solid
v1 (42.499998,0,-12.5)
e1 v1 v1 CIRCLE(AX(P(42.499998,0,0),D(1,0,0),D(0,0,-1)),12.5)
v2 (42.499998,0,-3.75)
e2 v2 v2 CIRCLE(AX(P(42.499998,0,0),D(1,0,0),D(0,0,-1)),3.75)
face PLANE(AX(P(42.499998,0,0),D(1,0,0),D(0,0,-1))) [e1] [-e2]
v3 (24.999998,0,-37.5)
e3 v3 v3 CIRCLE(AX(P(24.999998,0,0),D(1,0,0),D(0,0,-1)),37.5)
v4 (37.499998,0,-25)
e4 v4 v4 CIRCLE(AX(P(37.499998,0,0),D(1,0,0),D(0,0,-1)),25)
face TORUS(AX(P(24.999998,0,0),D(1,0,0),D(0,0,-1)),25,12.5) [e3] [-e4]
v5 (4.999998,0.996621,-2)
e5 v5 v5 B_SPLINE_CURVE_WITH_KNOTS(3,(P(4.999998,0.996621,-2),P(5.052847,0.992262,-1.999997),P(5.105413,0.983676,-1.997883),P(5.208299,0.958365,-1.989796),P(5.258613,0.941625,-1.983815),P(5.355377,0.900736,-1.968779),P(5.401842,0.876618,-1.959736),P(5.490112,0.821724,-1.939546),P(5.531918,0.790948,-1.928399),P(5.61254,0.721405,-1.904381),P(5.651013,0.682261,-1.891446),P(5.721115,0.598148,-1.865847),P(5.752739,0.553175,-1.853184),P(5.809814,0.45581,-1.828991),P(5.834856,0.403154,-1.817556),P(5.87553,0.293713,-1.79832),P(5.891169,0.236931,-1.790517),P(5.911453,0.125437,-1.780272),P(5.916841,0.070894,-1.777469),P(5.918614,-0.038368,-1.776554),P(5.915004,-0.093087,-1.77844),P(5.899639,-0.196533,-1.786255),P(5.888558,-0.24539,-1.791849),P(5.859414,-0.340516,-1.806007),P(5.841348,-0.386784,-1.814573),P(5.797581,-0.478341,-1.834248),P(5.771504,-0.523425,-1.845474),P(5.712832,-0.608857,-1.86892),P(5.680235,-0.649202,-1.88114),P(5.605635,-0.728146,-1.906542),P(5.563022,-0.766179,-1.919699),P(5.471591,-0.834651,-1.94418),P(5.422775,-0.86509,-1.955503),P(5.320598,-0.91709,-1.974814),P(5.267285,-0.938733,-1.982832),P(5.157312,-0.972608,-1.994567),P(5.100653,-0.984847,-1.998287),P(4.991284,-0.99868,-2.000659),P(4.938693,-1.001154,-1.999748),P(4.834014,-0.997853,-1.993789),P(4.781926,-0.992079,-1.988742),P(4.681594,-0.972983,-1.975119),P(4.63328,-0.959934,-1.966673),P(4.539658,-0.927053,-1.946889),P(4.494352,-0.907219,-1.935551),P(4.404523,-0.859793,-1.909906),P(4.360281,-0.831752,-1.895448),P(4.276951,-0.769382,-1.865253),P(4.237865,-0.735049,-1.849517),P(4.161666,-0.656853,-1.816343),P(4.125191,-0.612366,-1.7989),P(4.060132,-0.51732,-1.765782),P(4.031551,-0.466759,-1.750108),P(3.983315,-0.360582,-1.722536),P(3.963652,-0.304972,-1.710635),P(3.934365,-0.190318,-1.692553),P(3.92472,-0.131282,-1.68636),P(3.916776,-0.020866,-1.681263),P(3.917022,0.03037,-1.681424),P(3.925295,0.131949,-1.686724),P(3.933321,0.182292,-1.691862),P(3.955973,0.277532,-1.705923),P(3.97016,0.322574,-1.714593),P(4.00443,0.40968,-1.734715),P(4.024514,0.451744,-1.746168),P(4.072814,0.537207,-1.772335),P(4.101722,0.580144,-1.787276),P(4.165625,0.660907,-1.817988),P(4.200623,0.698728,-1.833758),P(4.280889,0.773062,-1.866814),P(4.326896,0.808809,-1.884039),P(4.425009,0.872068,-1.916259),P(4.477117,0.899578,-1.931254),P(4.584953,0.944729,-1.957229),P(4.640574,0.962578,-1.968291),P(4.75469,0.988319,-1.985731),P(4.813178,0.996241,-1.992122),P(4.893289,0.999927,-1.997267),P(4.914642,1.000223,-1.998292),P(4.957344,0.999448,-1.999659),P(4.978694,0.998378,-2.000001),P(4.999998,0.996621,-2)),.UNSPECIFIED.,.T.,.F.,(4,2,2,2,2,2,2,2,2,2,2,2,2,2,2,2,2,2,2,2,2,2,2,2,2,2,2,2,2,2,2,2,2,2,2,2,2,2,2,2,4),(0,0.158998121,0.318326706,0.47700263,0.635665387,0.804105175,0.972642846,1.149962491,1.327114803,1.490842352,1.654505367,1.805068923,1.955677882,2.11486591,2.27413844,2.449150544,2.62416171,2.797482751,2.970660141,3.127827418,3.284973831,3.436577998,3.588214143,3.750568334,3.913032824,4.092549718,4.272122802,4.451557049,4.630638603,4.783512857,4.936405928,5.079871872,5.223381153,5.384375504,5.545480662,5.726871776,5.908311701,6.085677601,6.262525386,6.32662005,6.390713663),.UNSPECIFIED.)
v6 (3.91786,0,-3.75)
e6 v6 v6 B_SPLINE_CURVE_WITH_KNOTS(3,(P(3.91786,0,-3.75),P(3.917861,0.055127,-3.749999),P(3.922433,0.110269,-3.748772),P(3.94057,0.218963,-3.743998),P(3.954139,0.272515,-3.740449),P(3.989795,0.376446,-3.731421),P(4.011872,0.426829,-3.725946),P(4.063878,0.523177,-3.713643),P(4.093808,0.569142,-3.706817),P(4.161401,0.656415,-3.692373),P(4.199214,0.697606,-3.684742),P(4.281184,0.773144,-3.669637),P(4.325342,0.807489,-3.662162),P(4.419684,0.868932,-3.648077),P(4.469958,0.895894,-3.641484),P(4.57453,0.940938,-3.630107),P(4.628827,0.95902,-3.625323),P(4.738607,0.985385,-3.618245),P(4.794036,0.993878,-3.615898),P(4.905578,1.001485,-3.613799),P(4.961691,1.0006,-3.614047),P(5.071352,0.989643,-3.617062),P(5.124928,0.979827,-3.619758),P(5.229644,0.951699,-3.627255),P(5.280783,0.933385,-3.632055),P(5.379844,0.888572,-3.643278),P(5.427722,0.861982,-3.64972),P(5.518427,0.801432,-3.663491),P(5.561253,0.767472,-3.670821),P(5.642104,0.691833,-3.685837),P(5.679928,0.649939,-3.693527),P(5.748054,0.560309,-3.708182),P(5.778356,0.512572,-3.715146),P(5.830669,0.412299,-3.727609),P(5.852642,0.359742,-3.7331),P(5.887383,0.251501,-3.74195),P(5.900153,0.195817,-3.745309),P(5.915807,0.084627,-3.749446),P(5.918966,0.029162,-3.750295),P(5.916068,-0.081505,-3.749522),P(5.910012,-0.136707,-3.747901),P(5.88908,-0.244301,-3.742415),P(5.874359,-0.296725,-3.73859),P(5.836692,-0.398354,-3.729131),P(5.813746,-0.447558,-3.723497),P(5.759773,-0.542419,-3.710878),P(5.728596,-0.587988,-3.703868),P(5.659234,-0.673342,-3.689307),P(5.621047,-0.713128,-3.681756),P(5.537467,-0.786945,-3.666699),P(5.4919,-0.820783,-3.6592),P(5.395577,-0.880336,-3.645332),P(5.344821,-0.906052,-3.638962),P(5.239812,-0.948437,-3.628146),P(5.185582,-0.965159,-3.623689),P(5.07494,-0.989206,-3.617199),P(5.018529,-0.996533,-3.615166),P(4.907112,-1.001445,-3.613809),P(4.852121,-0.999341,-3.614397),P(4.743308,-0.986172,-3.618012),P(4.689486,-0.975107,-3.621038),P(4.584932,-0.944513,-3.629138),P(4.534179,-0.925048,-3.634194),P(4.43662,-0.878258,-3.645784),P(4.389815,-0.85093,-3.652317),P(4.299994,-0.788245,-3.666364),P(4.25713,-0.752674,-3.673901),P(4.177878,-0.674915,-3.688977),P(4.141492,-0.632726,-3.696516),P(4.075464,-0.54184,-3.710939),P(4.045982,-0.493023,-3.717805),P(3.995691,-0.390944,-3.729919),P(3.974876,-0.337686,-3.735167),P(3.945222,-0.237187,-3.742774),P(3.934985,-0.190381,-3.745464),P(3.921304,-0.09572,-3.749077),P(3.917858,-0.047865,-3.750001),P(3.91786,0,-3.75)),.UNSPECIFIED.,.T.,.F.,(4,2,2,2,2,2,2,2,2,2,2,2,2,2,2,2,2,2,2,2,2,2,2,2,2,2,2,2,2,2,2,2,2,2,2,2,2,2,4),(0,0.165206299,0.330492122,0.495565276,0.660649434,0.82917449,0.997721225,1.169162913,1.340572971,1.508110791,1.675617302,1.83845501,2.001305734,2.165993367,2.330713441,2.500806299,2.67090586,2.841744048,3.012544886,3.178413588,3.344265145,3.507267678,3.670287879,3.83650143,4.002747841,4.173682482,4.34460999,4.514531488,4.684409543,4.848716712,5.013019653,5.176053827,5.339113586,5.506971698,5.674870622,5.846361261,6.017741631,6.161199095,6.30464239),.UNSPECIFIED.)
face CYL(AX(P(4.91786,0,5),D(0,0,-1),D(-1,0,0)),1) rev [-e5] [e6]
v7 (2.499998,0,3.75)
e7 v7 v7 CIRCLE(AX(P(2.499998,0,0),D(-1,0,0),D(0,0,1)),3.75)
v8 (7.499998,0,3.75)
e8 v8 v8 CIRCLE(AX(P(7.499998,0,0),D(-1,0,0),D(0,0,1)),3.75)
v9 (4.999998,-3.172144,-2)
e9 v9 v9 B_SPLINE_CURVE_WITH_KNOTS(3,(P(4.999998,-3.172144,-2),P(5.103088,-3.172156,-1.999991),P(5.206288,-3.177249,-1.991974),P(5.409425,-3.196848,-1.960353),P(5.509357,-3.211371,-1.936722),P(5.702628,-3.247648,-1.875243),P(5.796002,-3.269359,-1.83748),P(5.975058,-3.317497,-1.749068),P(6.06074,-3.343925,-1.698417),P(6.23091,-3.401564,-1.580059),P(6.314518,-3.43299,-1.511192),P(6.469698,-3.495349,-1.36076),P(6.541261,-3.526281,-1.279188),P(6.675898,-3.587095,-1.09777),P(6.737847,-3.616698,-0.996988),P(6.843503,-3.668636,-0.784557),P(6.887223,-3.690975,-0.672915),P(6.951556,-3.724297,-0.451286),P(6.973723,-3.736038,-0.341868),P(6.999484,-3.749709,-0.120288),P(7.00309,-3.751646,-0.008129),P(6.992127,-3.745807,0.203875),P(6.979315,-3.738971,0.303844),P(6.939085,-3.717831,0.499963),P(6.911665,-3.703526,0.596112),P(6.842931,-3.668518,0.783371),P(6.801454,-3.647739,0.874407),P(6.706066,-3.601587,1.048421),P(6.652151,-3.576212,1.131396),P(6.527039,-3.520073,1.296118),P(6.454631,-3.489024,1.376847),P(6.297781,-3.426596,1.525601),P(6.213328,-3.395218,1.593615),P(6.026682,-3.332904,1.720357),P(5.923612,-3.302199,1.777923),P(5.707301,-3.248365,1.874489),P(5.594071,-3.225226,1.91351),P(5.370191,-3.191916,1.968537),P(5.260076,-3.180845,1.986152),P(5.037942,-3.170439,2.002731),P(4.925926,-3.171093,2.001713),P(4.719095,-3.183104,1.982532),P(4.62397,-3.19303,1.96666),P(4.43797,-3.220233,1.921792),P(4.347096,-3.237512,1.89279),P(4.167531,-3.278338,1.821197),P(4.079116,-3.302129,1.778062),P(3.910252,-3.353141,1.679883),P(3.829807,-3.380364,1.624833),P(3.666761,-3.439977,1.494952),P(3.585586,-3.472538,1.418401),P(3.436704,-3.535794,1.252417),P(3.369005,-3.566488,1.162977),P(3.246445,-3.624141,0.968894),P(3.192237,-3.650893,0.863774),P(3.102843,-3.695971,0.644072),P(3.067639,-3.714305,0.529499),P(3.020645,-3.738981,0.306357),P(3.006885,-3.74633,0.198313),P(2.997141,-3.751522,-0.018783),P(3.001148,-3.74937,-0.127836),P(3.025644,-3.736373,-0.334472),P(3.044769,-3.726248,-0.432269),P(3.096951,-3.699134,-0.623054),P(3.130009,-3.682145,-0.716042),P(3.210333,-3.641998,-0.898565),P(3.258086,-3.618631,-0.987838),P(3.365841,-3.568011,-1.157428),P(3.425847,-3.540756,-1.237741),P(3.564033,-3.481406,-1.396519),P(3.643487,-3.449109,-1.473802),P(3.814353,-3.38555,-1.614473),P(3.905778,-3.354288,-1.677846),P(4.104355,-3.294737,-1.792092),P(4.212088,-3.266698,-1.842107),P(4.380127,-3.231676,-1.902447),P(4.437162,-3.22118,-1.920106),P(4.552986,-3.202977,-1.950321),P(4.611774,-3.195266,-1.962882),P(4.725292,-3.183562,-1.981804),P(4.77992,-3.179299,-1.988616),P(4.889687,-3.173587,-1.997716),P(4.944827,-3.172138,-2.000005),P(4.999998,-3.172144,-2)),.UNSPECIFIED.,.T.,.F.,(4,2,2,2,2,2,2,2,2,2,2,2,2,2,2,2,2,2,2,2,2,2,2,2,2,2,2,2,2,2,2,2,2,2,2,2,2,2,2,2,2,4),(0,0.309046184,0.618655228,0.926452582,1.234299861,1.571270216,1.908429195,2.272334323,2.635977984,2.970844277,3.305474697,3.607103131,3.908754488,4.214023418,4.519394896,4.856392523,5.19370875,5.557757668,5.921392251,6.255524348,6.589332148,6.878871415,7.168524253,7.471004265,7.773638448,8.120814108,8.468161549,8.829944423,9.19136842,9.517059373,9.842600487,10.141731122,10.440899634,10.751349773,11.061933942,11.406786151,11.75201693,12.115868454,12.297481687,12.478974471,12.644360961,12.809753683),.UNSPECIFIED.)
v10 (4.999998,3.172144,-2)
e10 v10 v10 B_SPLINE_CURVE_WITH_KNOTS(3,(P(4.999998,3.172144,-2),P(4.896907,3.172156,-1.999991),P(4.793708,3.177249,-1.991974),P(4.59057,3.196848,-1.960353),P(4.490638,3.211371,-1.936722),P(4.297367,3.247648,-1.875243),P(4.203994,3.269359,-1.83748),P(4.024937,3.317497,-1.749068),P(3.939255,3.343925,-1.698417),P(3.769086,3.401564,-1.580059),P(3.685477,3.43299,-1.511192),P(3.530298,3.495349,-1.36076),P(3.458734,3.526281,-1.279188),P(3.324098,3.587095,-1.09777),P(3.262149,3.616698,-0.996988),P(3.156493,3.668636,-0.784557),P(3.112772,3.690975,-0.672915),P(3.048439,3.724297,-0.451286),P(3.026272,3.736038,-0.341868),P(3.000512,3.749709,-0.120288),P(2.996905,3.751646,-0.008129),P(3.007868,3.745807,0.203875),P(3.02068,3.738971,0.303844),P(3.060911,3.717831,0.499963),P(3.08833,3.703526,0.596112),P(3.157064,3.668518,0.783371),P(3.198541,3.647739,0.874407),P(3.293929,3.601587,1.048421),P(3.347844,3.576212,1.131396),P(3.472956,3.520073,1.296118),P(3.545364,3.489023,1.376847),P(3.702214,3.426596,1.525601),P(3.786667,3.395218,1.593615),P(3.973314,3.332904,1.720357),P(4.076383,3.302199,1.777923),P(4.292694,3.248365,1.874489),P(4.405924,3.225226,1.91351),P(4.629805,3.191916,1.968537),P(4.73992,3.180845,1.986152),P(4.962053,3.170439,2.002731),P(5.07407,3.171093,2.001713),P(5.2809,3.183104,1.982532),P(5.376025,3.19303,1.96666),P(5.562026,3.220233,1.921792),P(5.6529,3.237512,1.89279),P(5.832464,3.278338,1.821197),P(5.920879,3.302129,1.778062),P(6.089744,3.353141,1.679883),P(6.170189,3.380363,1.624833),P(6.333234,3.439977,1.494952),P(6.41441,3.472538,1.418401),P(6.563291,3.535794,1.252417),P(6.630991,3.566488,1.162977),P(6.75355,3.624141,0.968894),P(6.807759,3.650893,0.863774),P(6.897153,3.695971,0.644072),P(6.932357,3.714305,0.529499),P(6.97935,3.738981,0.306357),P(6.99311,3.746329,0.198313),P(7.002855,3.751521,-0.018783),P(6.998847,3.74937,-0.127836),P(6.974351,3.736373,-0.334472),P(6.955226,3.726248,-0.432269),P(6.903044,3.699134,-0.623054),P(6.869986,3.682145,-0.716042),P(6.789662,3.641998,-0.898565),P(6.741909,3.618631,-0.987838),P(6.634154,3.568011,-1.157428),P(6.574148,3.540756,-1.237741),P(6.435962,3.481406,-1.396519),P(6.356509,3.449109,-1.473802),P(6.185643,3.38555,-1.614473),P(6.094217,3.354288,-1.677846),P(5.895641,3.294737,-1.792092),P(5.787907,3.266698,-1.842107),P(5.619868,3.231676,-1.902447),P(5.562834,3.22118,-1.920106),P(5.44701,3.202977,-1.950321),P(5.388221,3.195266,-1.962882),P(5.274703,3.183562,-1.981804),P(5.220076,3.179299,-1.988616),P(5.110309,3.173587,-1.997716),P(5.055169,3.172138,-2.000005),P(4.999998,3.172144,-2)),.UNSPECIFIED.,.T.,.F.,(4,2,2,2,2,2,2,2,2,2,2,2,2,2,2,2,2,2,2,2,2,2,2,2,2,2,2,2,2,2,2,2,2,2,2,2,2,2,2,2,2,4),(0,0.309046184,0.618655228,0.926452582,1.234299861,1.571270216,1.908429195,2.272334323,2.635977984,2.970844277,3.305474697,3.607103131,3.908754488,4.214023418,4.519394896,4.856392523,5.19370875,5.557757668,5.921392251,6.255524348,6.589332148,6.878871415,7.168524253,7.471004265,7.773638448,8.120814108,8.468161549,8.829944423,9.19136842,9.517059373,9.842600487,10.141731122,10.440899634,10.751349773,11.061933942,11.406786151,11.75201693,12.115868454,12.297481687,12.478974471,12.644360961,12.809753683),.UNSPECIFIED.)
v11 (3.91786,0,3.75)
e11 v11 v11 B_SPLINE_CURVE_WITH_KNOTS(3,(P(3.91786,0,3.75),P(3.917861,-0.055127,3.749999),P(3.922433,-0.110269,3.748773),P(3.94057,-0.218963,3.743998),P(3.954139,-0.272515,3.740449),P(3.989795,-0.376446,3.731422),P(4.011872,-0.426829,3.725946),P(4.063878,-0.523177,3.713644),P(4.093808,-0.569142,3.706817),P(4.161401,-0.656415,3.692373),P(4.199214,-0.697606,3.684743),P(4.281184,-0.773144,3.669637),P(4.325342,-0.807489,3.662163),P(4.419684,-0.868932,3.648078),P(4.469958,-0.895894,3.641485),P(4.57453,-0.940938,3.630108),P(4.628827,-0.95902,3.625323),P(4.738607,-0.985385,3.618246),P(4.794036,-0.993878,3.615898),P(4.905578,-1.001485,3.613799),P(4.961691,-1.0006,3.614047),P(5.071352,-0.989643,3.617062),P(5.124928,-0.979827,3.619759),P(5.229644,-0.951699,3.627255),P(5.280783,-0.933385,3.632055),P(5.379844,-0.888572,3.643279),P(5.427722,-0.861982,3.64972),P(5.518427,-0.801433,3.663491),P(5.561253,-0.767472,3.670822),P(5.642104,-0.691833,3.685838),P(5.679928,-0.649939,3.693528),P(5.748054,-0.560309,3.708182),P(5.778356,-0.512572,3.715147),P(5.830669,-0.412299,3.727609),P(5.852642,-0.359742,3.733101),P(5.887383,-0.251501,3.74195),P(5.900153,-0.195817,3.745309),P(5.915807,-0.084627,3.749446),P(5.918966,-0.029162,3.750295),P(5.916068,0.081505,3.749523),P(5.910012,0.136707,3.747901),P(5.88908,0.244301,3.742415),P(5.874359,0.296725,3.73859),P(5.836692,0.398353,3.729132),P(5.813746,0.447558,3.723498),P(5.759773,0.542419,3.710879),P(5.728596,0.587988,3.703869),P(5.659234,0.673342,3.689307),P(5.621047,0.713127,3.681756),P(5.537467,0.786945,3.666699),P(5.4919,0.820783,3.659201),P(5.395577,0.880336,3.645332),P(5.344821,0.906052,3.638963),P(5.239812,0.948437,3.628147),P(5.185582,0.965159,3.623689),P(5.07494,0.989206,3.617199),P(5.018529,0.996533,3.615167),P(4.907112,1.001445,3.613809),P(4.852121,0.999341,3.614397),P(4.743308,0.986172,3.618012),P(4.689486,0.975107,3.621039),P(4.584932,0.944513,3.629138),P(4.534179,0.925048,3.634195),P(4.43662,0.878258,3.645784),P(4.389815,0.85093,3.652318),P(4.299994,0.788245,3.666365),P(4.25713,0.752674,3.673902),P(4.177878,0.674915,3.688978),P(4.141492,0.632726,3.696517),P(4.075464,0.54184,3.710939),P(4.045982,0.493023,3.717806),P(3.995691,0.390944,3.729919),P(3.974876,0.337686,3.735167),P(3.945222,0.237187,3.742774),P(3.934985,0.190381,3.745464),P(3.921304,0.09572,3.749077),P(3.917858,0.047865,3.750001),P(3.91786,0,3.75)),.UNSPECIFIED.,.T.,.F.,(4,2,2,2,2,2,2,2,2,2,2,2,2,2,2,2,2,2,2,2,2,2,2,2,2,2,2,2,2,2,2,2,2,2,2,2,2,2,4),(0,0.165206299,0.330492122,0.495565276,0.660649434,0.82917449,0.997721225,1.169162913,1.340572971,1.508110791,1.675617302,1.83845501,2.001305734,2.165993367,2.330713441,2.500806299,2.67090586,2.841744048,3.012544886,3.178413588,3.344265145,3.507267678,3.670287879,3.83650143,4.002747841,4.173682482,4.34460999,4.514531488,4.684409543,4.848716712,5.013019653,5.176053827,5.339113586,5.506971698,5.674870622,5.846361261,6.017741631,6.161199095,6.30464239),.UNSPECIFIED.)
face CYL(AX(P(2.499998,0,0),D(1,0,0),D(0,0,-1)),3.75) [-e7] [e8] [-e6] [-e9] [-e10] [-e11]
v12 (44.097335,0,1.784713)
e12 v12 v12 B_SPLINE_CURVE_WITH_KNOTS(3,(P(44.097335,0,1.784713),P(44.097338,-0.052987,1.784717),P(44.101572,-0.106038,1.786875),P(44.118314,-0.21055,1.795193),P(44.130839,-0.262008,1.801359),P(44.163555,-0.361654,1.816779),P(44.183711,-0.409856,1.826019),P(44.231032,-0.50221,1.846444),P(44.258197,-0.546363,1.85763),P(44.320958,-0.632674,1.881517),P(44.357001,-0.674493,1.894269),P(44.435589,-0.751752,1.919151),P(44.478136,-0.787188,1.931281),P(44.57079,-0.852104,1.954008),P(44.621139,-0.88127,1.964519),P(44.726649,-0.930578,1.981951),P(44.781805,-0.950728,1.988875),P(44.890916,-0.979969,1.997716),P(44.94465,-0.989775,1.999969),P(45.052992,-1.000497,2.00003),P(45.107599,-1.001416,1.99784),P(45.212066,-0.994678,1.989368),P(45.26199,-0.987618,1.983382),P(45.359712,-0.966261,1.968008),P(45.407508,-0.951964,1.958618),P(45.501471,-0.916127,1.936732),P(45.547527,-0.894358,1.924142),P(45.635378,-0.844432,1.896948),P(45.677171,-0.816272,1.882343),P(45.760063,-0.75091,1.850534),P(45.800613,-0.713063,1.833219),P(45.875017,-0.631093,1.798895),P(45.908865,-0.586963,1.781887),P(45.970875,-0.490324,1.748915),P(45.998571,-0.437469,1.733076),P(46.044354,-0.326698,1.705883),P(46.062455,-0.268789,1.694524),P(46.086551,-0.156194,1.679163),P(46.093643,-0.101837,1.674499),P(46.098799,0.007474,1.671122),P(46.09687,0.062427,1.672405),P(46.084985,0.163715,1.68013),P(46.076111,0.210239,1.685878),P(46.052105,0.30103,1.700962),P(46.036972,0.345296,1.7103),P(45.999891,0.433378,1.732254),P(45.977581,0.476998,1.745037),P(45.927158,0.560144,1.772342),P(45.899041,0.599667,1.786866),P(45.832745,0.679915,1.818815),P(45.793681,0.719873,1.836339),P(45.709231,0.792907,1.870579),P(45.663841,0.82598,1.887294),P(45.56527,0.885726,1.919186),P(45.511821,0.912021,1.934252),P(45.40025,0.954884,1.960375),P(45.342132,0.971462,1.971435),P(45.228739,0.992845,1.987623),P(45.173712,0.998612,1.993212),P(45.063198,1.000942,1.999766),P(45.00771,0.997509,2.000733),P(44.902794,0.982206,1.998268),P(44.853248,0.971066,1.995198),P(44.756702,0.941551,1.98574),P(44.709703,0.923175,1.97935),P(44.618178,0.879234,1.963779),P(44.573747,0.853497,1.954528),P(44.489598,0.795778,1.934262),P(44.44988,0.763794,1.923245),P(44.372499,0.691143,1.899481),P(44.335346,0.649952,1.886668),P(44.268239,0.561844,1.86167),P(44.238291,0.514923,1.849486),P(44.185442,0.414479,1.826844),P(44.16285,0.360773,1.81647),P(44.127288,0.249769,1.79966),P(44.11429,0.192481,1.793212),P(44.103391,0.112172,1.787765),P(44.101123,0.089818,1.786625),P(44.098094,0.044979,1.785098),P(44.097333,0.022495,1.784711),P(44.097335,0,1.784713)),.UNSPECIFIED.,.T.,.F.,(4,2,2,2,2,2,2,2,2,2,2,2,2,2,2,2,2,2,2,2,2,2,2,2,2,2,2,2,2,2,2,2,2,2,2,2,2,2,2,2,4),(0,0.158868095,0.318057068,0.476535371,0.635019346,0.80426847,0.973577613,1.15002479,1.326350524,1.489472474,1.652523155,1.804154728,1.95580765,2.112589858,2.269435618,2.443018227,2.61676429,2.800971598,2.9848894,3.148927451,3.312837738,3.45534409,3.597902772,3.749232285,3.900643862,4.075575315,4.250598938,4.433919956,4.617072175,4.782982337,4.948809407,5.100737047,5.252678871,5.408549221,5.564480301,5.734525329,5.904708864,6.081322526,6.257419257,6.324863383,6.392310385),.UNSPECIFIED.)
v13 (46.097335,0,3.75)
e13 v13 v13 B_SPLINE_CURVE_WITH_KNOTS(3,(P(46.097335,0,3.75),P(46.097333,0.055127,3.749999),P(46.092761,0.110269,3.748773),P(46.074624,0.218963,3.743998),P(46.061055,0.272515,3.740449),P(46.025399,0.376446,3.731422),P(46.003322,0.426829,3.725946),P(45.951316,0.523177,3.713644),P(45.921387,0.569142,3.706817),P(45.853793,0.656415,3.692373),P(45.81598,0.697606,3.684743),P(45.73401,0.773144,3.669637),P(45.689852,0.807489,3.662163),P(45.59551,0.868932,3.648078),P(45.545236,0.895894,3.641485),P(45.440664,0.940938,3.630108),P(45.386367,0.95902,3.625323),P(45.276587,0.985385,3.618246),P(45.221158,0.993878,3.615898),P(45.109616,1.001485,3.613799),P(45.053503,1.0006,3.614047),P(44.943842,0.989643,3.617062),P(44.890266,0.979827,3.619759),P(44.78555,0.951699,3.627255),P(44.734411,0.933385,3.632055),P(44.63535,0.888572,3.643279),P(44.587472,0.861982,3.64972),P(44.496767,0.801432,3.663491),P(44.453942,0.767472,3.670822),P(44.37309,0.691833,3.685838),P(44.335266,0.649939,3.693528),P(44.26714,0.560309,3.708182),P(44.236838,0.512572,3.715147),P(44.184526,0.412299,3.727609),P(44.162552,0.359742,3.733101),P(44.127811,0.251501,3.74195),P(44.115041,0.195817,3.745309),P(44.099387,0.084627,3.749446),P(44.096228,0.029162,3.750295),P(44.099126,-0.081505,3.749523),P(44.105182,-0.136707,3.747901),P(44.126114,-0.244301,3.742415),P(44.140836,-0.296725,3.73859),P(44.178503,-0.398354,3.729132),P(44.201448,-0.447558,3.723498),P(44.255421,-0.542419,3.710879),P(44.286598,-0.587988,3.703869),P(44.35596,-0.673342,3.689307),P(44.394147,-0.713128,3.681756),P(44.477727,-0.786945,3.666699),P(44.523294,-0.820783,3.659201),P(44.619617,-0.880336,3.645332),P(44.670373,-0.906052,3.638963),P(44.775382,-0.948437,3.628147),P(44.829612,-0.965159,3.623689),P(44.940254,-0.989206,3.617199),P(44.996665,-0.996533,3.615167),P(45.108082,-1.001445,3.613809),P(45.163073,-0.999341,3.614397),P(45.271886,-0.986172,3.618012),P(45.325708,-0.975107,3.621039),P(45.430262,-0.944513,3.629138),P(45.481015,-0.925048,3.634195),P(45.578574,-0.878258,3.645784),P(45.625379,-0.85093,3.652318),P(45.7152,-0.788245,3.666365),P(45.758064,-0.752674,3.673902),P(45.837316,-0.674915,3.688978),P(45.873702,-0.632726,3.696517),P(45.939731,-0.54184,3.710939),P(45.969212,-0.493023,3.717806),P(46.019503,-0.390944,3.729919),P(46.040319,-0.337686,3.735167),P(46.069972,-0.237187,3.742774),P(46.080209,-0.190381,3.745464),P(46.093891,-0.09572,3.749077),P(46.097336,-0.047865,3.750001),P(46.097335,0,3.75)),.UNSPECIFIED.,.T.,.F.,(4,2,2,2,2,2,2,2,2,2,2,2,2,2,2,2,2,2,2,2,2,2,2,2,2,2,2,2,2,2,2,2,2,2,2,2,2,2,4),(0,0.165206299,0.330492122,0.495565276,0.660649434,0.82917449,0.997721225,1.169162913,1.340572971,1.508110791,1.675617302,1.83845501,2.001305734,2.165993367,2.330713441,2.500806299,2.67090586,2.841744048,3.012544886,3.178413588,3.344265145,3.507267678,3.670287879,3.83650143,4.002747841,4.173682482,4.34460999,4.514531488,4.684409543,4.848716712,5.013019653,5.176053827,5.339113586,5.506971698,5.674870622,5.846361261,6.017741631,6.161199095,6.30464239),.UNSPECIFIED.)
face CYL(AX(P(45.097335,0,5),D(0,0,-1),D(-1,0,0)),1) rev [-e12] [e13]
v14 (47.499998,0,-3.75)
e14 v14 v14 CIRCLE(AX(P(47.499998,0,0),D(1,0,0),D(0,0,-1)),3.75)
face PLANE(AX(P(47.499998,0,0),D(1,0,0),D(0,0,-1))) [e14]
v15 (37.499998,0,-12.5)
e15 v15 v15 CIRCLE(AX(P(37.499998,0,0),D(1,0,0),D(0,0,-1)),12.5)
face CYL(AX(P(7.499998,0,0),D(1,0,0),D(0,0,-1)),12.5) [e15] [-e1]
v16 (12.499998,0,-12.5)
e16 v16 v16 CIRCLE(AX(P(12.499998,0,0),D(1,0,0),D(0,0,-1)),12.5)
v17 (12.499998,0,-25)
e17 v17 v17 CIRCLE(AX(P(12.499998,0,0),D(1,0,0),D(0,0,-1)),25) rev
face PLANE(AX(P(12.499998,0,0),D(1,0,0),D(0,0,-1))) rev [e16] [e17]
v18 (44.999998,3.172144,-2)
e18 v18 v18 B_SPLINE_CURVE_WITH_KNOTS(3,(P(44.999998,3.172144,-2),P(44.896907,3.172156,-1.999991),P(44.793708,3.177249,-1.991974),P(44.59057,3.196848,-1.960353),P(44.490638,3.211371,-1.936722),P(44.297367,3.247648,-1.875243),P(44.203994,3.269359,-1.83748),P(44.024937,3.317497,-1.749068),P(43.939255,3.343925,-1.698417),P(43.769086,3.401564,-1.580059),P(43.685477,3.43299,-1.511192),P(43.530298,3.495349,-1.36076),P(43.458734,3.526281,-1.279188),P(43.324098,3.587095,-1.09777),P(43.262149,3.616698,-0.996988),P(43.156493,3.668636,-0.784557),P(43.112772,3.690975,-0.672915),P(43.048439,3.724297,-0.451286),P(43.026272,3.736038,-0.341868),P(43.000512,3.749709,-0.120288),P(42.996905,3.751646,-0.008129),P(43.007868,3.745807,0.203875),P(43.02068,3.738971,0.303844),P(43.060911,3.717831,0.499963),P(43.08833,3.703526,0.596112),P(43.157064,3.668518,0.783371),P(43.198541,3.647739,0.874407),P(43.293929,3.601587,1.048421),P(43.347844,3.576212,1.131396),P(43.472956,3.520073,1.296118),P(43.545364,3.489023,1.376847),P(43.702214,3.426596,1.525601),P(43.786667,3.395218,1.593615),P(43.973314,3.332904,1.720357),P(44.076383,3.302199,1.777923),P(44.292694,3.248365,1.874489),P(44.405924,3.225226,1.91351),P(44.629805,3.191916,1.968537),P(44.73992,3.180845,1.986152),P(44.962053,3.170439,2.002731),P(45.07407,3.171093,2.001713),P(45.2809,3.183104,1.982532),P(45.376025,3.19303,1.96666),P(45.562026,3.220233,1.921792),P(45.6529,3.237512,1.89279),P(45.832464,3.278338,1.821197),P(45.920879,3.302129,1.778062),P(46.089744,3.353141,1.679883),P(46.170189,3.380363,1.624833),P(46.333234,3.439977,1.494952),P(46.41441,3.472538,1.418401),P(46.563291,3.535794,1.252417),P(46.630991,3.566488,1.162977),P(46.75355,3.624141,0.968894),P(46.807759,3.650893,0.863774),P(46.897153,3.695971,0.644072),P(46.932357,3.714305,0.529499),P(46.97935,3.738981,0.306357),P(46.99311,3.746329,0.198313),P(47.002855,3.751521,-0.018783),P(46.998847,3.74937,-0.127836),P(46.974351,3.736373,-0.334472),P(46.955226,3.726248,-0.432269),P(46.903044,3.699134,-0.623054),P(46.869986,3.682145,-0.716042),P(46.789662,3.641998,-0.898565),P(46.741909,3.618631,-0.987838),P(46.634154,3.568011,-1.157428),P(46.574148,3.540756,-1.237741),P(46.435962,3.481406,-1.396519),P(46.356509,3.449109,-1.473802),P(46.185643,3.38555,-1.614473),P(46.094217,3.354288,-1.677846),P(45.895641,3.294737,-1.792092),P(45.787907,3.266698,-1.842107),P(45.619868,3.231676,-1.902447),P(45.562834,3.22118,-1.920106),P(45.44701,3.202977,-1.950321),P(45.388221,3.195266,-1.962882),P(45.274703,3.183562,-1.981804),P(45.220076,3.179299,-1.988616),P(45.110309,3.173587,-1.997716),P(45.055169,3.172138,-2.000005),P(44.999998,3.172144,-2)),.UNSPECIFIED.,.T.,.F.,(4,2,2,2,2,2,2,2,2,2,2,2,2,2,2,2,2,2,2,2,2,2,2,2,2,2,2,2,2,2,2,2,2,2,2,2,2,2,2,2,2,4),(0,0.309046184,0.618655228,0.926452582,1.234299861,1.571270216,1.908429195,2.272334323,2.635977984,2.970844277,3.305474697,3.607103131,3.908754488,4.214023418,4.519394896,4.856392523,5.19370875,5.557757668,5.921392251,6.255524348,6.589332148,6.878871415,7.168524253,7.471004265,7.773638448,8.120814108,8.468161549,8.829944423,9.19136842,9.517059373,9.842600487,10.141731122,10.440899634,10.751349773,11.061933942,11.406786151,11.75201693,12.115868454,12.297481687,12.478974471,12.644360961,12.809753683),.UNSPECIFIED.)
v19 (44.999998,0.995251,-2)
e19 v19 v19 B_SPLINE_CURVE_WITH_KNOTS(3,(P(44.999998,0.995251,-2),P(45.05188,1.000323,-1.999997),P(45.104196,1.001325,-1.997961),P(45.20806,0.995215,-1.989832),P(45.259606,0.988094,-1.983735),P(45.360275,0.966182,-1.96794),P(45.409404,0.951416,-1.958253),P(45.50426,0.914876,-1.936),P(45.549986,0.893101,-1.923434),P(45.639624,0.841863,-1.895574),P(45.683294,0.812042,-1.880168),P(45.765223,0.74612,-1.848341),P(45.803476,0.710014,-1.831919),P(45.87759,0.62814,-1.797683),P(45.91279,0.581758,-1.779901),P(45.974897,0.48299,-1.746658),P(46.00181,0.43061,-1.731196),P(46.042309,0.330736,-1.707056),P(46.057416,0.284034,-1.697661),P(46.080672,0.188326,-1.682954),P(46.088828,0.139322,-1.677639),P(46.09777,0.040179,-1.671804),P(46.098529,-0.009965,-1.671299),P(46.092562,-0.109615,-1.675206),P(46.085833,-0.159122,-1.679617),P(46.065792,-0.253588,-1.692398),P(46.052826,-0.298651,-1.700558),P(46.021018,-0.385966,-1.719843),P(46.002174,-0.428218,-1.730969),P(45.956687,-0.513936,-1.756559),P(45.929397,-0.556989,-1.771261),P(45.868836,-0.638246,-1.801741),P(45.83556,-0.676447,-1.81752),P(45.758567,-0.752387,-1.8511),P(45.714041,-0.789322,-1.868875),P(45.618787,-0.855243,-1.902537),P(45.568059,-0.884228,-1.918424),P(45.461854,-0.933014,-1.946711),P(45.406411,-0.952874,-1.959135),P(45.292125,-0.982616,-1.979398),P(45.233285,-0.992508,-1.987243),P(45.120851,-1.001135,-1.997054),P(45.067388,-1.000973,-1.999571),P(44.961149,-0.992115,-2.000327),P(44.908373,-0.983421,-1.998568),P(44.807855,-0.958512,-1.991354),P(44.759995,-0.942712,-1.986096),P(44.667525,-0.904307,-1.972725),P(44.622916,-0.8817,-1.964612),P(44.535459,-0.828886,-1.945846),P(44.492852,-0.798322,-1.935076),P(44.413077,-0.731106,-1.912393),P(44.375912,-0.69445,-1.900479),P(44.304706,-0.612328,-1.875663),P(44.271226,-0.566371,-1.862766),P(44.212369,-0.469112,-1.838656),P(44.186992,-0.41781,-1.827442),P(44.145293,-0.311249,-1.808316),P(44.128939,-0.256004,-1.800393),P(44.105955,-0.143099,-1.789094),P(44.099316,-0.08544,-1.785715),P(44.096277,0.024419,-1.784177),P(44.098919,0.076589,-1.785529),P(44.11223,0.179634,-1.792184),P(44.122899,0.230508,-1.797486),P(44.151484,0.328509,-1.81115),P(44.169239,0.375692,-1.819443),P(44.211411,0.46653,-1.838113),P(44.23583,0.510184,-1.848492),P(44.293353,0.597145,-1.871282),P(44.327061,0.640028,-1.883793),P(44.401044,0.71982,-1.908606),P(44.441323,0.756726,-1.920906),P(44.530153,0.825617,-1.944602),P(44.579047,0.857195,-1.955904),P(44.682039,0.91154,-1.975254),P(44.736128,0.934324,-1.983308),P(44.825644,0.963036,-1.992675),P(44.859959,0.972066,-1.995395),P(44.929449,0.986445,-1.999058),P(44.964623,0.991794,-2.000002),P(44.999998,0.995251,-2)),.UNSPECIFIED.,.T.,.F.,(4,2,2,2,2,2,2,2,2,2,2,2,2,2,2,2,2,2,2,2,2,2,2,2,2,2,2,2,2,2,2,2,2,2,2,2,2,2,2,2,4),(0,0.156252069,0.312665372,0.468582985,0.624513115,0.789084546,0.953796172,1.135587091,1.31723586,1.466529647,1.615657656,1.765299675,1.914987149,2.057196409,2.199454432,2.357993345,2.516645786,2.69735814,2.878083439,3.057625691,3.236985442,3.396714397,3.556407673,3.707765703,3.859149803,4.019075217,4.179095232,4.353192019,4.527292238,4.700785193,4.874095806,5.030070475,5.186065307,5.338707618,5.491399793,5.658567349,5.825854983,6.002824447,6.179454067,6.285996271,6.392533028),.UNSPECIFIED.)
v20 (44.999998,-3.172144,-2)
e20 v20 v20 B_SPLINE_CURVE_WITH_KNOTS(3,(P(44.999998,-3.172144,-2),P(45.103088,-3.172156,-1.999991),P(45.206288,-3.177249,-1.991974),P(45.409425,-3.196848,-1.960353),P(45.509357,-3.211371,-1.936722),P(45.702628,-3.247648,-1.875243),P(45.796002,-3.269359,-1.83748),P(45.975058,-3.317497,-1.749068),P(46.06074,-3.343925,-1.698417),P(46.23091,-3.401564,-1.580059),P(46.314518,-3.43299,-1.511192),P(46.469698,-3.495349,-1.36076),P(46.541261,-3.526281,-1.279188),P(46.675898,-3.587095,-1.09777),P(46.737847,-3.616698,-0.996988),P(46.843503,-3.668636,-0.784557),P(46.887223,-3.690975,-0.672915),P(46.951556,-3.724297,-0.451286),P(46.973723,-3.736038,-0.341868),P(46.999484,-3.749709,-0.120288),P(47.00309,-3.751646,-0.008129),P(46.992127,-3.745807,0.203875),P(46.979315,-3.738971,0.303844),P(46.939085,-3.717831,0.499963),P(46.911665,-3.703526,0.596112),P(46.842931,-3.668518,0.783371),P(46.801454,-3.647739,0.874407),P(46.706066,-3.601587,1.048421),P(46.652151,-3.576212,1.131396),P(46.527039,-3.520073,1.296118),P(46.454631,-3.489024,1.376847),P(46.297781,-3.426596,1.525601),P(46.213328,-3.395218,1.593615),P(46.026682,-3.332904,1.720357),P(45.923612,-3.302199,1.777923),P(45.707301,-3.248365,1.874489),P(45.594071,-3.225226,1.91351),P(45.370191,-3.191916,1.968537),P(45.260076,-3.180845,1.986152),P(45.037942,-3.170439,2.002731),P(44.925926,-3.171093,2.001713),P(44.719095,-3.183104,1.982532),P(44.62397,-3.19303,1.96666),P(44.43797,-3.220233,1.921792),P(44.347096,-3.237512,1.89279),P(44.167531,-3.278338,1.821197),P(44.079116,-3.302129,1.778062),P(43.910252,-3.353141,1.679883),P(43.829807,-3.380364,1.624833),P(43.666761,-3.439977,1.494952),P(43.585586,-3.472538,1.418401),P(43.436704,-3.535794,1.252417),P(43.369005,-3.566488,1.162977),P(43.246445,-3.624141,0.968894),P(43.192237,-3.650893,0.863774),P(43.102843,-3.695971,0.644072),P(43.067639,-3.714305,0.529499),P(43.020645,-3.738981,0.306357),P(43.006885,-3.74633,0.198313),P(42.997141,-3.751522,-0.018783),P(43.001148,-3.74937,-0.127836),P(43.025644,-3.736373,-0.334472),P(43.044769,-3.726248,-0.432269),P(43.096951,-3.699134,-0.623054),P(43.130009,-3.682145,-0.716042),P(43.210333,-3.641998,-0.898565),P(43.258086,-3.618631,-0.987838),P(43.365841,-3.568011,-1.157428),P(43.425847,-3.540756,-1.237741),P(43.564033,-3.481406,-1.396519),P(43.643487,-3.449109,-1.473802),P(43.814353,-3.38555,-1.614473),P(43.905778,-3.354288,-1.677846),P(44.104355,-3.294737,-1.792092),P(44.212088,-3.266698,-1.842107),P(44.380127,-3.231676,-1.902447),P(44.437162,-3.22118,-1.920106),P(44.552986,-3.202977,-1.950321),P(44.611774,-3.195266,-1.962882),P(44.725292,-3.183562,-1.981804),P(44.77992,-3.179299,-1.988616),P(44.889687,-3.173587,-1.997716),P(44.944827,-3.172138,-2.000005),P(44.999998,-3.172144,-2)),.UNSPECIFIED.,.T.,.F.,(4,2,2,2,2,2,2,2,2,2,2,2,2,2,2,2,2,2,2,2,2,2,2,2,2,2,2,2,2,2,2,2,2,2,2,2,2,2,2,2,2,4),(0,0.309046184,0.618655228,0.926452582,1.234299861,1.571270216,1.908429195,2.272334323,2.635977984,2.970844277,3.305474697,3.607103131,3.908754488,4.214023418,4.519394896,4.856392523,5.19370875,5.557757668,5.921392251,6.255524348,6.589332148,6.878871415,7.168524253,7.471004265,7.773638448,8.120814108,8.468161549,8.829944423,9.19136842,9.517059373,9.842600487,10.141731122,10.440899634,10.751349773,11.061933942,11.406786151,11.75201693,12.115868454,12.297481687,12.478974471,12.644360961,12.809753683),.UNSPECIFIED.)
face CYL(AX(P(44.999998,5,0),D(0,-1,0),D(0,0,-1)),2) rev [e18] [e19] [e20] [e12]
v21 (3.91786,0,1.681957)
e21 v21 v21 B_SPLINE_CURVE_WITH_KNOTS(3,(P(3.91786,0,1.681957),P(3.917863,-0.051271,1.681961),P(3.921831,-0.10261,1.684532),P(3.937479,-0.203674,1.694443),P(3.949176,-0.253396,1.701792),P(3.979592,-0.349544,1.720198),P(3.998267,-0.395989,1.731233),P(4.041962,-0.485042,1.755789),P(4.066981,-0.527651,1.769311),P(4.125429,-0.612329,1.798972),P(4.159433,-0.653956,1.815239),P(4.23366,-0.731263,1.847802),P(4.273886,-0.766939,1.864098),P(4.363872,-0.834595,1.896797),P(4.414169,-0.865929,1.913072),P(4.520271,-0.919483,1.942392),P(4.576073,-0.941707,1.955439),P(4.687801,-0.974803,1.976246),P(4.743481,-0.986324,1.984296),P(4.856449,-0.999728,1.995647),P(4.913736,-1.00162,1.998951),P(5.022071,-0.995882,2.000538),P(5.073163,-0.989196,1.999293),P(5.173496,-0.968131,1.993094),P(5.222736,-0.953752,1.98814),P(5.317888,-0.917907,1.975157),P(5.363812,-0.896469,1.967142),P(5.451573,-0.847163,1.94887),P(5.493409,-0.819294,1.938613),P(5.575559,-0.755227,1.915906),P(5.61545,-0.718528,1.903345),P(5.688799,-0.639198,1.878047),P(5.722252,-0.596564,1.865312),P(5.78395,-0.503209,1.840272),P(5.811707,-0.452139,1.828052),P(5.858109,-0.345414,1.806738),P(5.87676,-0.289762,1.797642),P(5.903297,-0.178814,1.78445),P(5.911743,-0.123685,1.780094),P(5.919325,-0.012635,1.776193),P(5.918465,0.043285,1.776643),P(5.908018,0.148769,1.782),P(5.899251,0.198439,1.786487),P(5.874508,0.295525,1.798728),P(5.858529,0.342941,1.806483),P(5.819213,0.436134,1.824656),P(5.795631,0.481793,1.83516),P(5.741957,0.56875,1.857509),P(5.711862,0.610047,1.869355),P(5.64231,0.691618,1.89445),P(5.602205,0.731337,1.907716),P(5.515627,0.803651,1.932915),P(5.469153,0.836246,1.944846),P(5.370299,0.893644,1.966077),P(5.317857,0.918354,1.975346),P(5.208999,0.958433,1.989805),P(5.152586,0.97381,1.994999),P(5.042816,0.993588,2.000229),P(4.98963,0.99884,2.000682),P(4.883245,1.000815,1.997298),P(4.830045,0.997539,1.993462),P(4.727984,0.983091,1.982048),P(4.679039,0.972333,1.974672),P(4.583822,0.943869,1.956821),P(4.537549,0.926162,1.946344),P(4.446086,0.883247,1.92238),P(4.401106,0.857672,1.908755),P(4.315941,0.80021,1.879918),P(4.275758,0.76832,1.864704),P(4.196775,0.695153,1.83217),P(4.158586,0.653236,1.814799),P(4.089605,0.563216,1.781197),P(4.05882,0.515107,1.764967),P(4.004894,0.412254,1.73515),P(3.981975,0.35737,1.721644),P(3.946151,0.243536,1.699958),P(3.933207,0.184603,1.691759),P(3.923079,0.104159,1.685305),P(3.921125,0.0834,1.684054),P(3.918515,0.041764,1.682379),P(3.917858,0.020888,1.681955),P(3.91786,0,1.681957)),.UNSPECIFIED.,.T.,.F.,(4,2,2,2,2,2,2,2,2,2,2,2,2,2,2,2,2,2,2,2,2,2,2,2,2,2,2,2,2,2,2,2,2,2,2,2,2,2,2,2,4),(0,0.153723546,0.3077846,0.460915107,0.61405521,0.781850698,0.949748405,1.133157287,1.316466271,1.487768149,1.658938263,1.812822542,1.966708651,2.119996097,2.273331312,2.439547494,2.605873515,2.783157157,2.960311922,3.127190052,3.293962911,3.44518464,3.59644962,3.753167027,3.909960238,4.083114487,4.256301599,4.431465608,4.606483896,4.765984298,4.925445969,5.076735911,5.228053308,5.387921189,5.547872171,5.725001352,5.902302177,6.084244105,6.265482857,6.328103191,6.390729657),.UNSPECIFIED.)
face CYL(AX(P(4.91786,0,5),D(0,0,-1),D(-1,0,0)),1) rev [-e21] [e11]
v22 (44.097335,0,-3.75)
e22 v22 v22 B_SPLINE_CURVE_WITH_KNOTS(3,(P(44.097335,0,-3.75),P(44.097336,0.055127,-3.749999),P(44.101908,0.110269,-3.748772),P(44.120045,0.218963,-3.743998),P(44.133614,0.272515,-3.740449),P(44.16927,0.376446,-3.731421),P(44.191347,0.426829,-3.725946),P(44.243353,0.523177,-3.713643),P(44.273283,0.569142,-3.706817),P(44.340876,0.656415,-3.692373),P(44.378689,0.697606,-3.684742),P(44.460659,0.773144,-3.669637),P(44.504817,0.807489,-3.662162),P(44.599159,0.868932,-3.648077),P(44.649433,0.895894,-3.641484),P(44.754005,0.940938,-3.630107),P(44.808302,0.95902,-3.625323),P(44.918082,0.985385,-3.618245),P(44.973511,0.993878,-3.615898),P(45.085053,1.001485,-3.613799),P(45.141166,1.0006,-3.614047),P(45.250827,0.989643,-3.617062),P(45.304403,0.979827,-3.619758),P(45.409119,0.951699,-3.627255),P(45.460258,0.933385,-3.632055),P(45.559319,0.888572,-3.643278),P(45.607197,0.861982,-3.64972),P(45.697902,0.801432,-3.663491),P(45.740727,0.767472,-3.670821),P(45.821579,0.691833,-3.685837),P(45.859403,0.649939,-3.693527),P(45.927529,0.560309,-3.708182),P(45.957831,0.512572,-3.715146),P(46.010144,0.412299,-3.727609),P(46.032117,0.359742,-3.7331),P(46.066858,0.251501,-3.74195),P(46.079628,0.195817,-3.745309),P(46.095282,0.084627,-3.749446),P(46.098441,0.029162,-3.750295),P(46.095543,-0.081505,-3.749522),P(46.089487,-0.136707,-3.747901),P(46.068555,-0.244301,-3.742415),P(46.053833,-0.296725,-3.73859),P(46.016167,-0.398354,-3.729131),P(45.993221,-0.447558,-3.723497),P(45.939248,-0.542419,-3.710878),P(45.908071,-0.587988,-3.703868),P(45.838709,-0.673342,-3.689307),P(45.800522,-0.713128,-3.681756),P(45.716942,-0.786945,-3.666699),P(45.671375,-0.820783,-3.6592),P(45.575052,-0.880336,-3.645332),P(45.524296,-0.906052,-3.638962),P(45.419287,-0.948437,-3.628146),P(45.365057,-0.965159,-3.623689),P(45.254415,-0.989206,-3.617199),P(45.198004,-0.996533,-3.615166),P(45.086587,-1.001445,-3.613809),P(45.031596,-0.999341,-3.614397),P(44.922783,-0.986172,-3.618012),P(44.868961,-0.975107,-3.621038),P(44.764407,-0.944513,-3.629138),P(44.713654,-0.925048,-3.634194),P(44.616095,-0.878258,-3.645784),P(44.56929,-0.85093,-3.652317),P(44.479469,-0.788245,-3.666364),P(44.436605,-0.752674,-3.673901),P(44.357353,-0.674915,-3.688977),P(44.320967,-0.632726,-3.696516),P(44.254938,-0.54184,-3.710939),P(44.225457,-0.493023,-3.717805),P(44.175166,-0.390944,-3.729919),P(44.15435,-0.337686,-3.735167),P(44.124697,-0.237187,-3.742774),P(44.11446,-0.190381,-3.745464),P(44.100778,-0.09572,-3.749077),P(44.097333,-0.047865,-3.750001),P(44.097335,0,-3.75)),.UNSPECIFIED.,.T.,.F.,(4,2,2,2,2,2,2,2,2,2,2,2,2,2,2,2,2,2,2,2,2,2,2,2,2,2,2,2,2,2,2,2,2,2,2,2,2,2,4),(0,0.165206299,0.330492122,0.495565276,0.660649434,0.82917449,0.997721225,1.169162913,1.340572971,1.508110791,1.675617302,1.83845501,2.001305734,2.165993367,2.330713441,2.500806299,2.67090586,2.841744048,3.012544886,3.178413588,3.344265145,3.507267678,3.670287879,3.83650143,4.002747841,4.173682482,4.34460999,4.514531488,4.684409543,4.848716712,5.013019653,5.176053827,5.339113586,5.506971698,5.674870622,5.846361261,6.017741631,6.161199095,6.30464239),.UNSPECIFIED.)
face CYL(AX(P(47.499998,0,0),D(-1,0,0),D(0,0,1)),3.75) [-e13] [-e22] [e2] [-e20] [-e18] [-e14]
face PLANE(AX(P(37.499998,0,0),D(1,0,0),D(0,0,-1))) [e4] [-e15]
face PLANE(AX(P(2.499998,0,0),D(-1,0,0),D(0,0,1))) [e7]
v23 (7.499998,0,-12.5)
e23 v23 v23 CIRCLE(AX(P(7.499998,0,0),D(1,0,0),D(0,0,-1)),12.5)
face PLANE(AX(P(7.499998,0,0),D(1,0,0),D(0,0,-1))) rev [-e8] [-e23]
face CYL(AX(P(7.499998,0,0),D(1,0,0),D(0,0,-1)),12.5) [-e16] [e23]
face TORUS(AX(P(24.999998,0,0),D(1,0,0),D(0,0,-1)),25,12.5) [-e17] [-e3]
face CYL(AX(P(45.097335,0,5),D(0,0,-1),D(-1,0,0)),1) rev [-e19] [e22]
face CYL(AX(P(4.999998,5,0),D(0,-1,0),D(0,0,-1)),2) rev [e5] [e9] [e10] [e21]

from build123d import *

# Parameters (mm, degrees)
IZIM1_R                          = 75
IZIM1_R_2                        = 25
Y_KSEKLIK_EKSTR_ZYON2_DEPTH      = 50
RADYUS2_R                        = 25
Y_KSEKLIK_EKSTR_ZYON3_DEPTH      = 60
Y_KSEKLIK_EKSTR_ZYON3_DEPTH_BACK = 10
IZIM2_R                          = 25
IZIM3_R                          = 7.5
Y_KSEKLIK_EKSTR_ZYON5_DEPTH      = 10
KES_EKSTR_ZYON1_DEPTH            = 10
KES_EKSTR_ZYON1_DEPTH_BACK       = 10
IZIM4_R                          = 4
Y_KSEKLIK_EKSTR_ZYON6_START      = 10
IZIM5_R                          = 7.5
Y_KSEKLIK_EKSTR_ZYON6_DEPTH      = 10
KES_EKSTR_ZYON2_DEPTH            = 10
KES_EKSTR_ZYON2_DEPTH_BACK       = 10
IZIM6_R                          = 4
KES_EKSTR_ZYON3_DEPTH            = 10
KES_EKSTR_ZYON3_DEPTH_BACK       = 10
IZIM7_R                          = 2
KES_EKSTR_ZYON4_DEPTH            = 10
KES_EKSTR_ZYON4_DEPTH_BACK       = 10
IZIM8_R                          = 2
L_EK2_SCALE                      = 0.5


with BuildPart() as part:
    # Çizim1 → Yükseklik-Ekstrüzyon2 (new body)
    with BuildSketch(Plane(origin=(0, 0, 0), x_dir=(0, 0, -1), z_dir=(1, 0, 0))):
        Circle(IZIM1_R)
        Circle(IZIM1_R_2, mode=Mode.SUBTRACT)
    extrude(amount=Y_KSEKLIK_EKSTR_ZYON2_DEPTH)

    # Radyus2
    radyus2_edges = [part.edges().sort_by_distance(p)[0] for p in [
        (0, 0, 75),
        (50, 0, 75),
    ]]
    fillet(radyus2_edges, radius=RADYUS2_R - 0.0001)  # a hair under: the kernel refuses the full size

    # Çizim2 → Yükseklik-Ekstrüzyon3 (add, two sides: drawn at the far end of the back side and taken through both)
    with BuildSketch(Plane(origin=(0, 0, 0), x_dir=(0, 0, -1), z_dir=(1, 0, 0)).offset(-Y_KSEKLIK_EKSTR_ZYON3_DEPTH_BACK)):
        Circle(IZIM2_R)
    extrude(amount=Y_KSEKLIK_EKSTR_ZYON3_DEPTH + Y_KSEKLIK_EKSTR_ZYON3_DEPTH_BACK)

    # Çizim3 → Yükseklik-Ekstrüzyon5 (add)
    with BuildSketch(Plane(origin=(60, 0, 0), x_dir=(0, 0, -1), z_dir=(1, 0, 0))):
        Circle(IZIM3_R)
    extrude(amount=Y_KSEKLIK_EKSTR_ZYON5_DEPTH)

    # Çizim4 → Kes-Ekstrüzyon1 (cut, two sides: drawn at the far end of the back side and taken through both)
    with BuildSketch(Plane(origin=(0, 0, 0), x_dir=(1, 0, 0), z_dir=(0, 1, 0)).offset(-KES_EKSTR_ZYON1_DEPTH_BACK)):
        with Locations(Location((65, 0, 0), (0, 0, 90))):
            Circle(IZIM4_R)
    extrude(amount=KES_EKSTR_ZYON1_DEPTH + KES_EKSTR_ZYON1_DEPTH_BACK, mode=Mode.SUBTRACT)

    # Çizim5 → Yükseklik-Ekstrüzyon6 (add)
    with BuildSketch(Plane.ZY.offset(10).offset(Y_KSEKLIK_EKSTR_ZYON6_START)):
        with Locations(Location((0, 0, 0), (0, 0, 180))):
            Circle(IZIM5_R)
    extrude(amount=-Y_KSEKLIK_EKSTR_ZYON6_DEPTH)

    # Çizim6 → Kes-Ekstrüzyon2 (cut, two sides: drawn at the far end of the back side and taken through both)
    with BuildSketch(Plane(origin=(0, 0, 0), x_dir=(1, 0, 0), z_dir=(0, 1, 0)).offset(-KES_EKSTR_ZYON2_DEPTH_BACK)):
        with Locations(Location((-15, 0, 0), (0, 0, 90))):
            Circle(IZIM6_R)
    extrude(amount=KES_EKSTR_ZYON2_DEPTH + KES_EKSTR_ZYON2_DEPTH_BACK, mode=Mode.SUBTRACT)

    # Çizim7 → Kes-Ekstrüzyon3 (cut, two sides: drawn at the far end of the back side and taken through both)
    with BuildSketch(Plane.XY.offset(-KES_EKSTR_ZYON3_DEPTH_BACK)):
        with Locations(Location((65.194673775, 0, 0), (0, 0, 180))):
            Circle(IZIM7_R)
    extrude(amount=KES_EKSTR_ZYON3_DEPTH + KES_EKSTR_ZYON3_DEPTH_BACK, mode=Mode.SUBTRACT)

    # Çizim8 → Kes-Ekstrüzyon4 (cut, two sides: drawn at the far end of the back side and taken through both)
    with BuildSketch(Plane.XY.offset(-KES_EKSTR_ZYON4_DEPTH_BACK)):
        with Locations(Location((-15.164276084, 0, 0), (0, 0, 180))):
            Circle(IZIM8_R)
    extrude(amount=KES_EKSTR_ZYON4_DEPTH + KES_EKSTR_ZYON4_DEPTH_BACK, mode=Mode.SUBTRACT)


with BuildPart() as part_1:
    # Ölçek2: scaled about (24.999995203, 7e-09, 5.8e-08)
    add(part.part.scale(L_EK2_SCALE).moved(Location((12.499997602, 3e-09, 2.9e-08))))


solid = part_1.part
